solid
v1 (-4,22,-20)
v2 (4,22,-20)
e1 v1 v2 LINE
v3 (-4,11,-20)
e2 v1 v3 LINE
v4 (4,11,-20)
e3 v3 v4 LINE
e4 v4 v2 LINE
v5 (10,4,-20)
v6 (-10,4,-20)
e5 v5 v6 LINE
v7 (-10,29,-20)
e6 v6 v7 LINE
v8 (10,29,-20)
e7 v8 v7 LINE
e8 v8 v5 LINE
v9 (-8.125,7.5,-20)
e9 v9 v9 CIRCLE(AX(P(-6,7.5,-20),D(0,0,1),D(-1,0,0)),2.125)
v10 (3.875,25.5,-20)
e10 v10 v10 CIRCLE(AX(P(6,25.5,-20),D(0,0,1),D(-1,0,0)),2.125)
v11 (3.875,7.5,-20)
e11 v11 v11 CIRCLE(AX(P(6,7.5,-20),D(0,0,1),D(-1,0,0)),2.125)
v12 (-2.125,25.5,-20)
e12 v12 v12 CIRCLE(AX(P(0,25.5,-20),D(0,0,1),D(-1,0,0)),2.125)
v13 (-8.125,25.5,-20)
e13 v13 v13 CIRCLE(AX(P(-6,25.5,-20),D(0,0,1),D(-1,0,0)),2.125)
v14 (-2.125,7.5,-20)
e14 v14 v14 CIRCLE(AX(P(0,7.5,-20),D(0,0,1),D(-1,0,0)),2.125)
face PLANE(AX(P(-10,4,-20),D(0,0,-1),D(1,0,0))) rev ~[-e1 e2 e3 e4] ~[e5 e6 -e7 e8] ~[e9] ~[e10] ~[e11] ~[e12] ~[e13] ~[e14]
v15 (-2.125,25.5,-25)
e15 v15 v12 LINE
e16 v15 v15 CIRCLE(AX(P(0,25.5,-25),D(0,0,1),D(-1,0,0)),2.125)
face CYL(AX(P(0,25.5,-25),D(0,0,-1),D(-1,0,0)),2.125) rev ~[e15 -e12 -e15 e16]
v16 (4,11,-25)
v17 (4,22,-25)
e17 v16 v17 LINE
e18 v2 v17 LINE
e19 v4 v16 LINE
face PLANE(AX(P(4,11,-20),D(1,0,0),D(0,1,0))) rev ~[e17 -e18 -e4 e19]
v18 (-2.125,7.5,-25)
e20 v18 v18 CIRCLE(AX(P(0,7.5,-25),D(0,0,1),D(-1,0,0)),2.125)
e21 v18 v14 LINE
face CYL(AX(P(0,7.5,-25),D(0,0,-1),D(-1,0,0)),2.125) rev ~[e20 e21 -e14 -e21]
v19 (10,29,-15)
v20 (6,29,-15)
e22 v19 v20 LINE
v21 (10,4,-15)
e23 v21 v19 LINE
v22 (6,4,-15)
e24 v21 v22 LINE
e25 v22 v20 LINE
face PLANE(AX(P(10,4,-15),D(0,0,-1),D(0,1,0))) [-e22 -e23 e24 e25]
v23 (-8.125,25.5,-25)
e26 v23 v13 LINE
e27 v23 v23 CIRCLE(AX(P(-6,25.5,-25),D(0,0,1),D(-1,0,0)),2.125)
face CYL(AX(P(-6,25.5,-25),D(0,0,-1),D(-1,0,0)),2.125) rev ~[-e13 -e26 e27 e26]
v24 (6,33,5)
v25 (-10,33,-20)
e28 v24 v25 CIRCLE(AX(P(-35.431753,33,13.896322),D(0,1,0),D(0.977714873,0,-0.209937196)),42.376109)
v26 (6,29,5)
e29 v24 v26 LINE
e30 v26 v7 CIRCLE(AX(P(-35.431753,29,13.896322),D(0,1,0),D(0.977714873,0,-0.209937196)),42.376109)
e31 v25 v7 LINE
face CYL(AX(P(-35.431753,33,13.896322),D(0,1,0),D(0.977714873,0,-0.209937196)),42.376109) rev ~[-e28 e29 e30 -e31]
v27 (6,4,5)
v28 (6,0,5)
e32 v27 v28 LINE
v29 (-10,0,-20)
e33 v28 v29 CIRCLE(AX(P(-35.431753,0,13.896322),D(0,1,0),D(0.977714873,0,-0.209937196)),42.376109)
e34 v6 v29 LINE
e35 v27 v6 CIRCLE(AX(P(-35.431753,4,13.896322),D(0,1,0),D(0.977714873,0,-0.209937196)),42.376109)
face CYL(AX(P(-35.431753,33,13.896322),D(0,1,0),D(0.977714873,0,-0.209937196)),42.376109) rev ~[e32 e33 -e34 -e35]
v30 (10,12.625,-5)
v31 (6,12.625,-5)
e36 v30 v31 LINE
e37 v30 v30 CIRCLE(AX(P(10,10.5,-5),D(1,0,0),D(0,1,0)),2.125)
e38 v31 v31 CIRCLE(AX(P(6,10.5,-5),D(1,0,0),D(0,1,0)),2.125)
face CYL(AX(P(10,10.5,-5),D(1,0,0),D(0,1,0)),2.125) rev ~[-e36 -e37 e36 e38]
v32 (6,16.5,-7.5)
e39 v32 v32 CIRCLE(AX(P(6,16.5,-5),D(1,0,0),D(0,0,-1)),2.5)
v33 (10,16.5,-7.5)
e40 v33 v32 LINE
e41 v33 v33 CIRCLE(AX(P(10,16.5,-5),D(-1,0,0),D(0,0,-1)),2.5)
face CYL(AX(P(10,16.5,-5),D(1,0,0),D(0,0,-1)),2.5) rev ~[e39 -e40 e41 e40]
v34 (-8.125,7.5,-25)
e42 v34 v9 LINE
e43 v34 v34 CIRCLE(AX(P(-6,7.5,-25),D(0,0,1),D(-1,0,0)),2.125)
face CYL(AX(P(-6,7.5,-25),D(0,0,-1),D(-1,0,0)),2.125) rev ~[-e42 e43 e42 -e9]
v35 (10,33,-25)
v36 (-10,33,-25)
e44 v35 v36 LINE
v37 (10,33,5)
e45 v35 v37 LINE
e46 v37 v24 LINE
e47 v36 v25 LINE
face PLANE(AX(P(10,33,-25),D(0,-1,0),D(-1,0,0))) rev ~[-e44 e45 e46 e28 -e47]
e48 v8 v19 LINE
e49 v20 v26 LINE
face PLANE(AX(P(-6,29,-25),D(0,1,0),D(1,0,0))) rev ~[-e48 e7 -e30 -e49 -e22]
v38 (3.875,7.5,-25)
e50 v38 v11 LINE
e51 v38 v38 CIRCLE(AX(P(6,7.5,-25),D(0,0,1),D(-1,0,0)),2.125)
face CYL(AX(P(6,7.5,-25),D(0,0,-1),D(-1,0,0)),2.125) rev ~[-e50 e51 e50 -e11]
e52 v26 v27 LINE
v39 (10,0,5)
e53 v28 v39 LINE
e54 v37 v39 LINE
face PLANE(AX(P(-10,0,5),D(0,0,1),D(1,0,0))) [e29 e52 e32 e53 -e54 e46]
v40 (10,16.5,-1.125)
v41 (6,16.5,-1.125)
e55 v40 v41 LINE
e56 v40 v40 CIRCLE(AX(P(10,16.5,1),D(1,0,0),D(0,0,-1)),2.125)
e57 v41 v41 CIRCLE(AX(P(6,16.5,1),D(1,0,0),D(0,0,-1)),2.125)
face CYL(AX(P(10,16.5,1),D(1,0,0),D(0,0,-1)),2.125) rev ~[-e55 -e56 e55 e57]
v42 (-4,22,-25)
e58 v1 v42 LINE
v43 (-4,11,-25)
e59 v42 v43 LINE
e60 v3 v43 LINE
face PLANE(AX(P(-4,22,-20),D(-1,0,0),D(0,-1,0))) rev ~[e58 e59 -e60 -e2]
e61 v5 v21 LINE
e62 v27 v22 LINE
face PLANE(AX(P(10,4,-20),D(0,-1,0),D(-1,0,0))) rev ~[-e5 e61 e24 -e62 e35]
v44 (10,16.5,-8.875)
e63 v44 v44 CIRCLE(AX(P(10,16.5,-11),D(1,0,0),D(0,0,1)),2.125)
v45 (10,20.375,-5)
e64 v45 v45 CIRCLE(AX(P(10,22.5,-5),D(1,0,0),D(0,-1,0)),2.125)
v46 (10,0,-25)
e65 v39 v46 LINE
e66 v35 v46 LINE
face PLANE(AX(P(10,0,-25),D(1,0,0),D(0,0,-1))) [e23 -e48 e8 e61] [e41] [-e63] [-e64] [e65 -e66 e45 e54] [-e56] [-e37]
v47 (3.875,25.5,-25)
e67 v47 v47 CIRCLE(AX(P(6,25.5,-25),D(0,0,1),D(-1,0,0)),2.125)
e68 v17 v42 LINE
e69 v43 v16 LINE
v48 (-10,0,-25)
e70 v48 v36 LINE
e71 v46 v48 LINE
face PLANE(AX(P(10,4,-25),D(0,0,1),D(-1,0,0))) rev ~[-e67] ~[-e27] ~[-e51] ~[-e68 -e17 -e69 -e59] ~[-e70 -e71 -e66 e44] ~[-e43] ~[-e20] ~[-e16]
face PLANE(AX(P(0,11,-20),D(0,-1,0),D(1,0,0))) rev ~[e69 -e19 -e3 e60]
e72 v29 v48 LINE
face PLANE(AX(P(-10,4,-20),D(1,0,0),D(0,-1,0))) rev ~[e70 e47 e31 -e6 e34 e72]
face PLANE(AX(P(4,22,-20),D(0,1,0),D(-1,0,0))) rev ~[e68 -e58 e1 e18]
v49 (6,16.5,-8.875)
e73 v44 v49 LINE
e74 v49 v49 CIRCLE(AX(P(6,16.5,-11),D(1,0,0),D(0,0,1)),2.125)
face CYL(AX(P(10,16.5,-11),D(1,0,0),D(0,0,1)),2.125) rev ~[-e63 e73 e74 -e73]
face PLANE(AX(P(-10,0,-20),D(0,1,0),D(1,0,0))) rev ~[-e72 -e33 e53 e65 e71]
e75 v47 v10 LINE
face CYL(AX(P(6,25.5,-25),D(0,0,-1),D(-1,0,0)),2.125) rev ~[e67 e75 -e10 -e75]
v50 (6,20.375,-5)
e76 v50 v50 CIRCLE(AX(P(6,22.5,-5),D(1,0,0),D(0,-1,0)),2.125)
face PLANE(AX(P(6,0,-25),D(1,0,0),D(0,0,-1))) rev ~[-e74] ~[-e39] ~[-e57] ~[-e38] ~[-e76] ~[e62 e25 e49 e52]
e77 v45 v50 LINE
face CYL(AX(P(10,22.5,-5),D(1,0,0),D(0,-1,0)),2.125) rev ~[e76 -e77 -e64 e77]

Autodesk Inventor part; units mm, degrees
ref_plane "YZ Plane" through (0, 0, 0) normal (1, 0, 0) x (0, 1, 0)
ref_plane "XZ Plane" through (0, 0, 0) normal (0, 1, 0) x (-1, 0, 0)
ref_plane "XY Plane" through (0, 0, 0) normal (0, 0, 1) x (1, 0, 0)
sketch "Sketch1" plane through (0, 0, 0) normal (0, 1, 0) x (-1, 0, 0)
  circle A0 centre (0, 0) radius 10
  dimension "d0" = 20
extrude "Extrusion1" add sketch "Sketch1" along normal blind 4
sketch "Sketch2" plane through (0, 4, 0) normal (0, 1, 0) x (1, 0, 0)
  line L0 (0, 0) -> (0, 6)
  circle A0 centre (0, 6) radius 2.125
  dimension "d3" = 6
  dimension "d4" = 4.25
extrude "Extrusion2" cut sketch "Sketch2" against normal through all
pattern_circular "Circular Pattern1" count 4 over 360 about axis through (0, 0, 0) along (0, 1, 0) of "Extrusion2"
sketch "Sketch3" plane through (0, 0, 0) normal (0, -1, 0) x (1, 0, 0)
  circle A0 centre (0, 0) radius 10 projected
  arc A1 (-10, 0) -> (10, 0) centre (0, 0) ccw
  line L0 (10, 0) -> (10, -25)
  line L1 (10, -25) -> (-10, -25)
  line L2 (-10, -25) -> (-10, 0)
  dimension "d10" = 25
extrude "Extrusion3" add sketch "Sketch3" against normal blind 4 contours L0 L1 L2 A0
sketch "Sketch4" plane through (0, 4, 0) normal (0, 1, 0) x (1, 0, 0)
  line L0 (-10, 25) -> (-10, 0) projected
  line L1 (10, 25) -> (-10, 25)
  line L2 (-10, 25) -> (-10, 20)
  line L3 (-10, 20) -> (10, 20)
  line L4 (10, 20) -> (10, 25)
  point P0 (0, 0)
  dimension "d13" = 5
extrude "Extrusion4" add sketch "Sketch4" along normal blind 27
sketch "Sketch5" plane through (10, 0, -25) normal (0, 0, -1) x (-1, 0, 0)
  point P0 (10, 0)
sketch "Sketch6" plane through (10, 0, -25) normal (0, 0, -1) x (-1, 0, 0)
  line L0 (7.875, 4) -> (12.125, 4) projected
  line L1 (20, 31) -> (0, 31) projected
  line L2 (10, 17.5) -> (20, 17.5)
  line L3 (10, 17.5) -> (10, 23.5)
  line L4 (10, 23.5) -> (10, 25.5)
  circle A0 centre (10, 25.5) radius 2.125
  point P0 (10, 0)
  dimension "d16" = 6
  dimension "d26" = 2
  dimension "d27" = 4.25
extrude "Extrusion5" cut sketch "Sketch6" against normal through all
pattern_linear "Rectangular Pattern1" count 3 spacing 6 along (-1, 0, 0) count 2 spacing 18 along (0, -1, 0) of "Extrusion5" first direction both ways yes
sketch "Sketch7" plane through (-10, 4, -20) normal (0, 0, 1) x (1, 0, 0)
  circle A0 centre (10, 21.5) radius 2.125 projected
  circle A1 centre (10, 3.5) radius 2.125 projected
  line L0 (10, 21.5) -> (10, 3.5)
  line L1 (6, 7) -> (14, 7)
  line L2 (14, 7) -> (14, 18)
  line L3 (14, 18) -> (6, 18)
  line L4 (6, 18) -> (6, 7)
  line L5 (6, 7) -> (14, 18) construction
  line L6 (14, 7) -> (6, 18) construction
  point P0 (10, -4)
  point P1 (10, 12.5)
  dimension "d29" = 8
  dimension "d30" = 11
extrude "Extrusion6" cut sketch "Sketch7" against normal through all contours L3 L2 L1 L0 | L0 L1 L4 L3
sketch "Sketch8" plane through (-10, 4, -20) normal (0, 0, 1) x (1, 0, 0)
  circle A0 centre (4, 21.5) radius 2.125 projected
  line L0 (4, 21.5) -> (4, 25)
  point P0 (10, -4)
  dimension "d33" = 3.5
sketch "Sketch9" plane through (10, 0, -25) normal (0, 0, -1) x (-1, 0, 0)
  circle A0 centre (16, 25.5) radius 2.125 projected
  line L0 (16, 25.5) -> (16, 29)
  line L1 (20, 4) -> (20, 31) projected
  line L2 (20, 29) -> (0, 29)
  line L3 (0, 29) -> (0, 33)
  line L4 (0, 33) -> (20, 33)
  line L5 (20, 33) -> (20, 29)
  point P0 (10, 0)
  dimension "d34" = 3.5
  dimension "d35" = 4
extrude "Extrusion7" add sketch "Sketch9" against normal blind 30 contours L2 L3 L4 L5 L1
sketch "Sketch10" plane through (0, 0, 0) normal (0, -1, 0) x (1, 0, 0)
  line L0 (-10, -20) -> (11.4929, -20)
  line L1 (11.4929, -20) -> (11.4929, 11.4929)
  line L2 (11.4929, 11.4929) -> (-10, 11.4929)
  line L3 (-10, 11.4929) -> (-10, -20)
  point P0 (0, 0)
extrude "Extrusion8" cut sketch "Sketch10" against normal blind 4
sketch "Sketch11" plane through (-10, 0, -20) normal (0, 0, 1) x (1, 0, 0)
  line L0 (20, 29) -> (20, 0) projected
  line L1 (0, 0) -> (20, 0)
  line L2 (20, 0) -> (20, 4)
  line L3 (20, 4) -> (0, 4)
  line L4 (0, 4) -> (0, 0)
  point P0 (10, 0)
  dimension "d40" = 4
extrude "Extrusion9" add sketch "Sketch11" along normal blind 25
sketch "Sketch12" plane through (10, 0, -25) normal (1, 0, 0) x (0, 0, -1)
  line L0 (-5, 29) -> (-30, 29) projected
  line L1 (-30, 4) -> (-10, 4)
  line L2 (-10, 4) -> (-10, 29)
  line L3 (-10, 29) -> (-30, 29)
  line L4 (-30, 29) -> (-30, 4)
  point P0 (-25, 0)
  dimension "d43" = 20
extrude "Extrusion10" add sketch "Sketch12" against normal blind 4
sketch "Sketch13" plane through (10, 0, 5) normal (1, 0, 0) x (0, 0, -1)
  line L0 (20, 29) -> (20, 4) projected
  line L1 (20, 16.5) -> (0, 16.5)
  line L2 (0, 0) -> (0, 33) projected
  line L3 (10, 16.5) -> (4, 16.5)
  circle A0 centre (10, 16.5) radius 2.5
  point P0 (5, 0)
  dimension "d46" = 6
  dimension "d47" = 5
extrude "Extrusion11" cut sketch "Sketch13" against normal through all
sketch "Sketch14" plane through (10, 0, 5) normal (1, 0, 0) x (0, 0, -1)
  circle A0 centre (10, 16.5) radius 2.5 projected
  line L0 (10, 16.5) -> (4, 16.5)
  circle A1 centre (4, 16.5) radius 2.125
  point P0 (5, 0)
  dimension "d50" = 6
  dimension "d51" = 4.25
extrude "Extrusion12" cut sketch "Sketch14" against normal through all contours A1
pattern_circular "Circular Pattern2" count 4 over 360 about axis through (10, 16.5, -5) along (-1, 0, 0) of "Extrusion12"
sketch "Sketch15" plane through (-10, 33, -25) normal (0, 1, 0) x (1, 0, 0)
  line L0 (16, -30) -> (0, -30)
  line L1 (0, -30) -> (16, -30) projected
  line L2 (0, -30) -> (0, -5)
  line L3 (0, 0) -> (0, -30) projected
  arc A0 (16, -30) -> (0, -5) centre (-25.4317, -38.8963) ccw
  point P0 (10, -25)
  dimension "d57" = 25
extrude "Extrusion13" cut sketch "Sketch15" against normal through all
properties part number "PickJoint"
